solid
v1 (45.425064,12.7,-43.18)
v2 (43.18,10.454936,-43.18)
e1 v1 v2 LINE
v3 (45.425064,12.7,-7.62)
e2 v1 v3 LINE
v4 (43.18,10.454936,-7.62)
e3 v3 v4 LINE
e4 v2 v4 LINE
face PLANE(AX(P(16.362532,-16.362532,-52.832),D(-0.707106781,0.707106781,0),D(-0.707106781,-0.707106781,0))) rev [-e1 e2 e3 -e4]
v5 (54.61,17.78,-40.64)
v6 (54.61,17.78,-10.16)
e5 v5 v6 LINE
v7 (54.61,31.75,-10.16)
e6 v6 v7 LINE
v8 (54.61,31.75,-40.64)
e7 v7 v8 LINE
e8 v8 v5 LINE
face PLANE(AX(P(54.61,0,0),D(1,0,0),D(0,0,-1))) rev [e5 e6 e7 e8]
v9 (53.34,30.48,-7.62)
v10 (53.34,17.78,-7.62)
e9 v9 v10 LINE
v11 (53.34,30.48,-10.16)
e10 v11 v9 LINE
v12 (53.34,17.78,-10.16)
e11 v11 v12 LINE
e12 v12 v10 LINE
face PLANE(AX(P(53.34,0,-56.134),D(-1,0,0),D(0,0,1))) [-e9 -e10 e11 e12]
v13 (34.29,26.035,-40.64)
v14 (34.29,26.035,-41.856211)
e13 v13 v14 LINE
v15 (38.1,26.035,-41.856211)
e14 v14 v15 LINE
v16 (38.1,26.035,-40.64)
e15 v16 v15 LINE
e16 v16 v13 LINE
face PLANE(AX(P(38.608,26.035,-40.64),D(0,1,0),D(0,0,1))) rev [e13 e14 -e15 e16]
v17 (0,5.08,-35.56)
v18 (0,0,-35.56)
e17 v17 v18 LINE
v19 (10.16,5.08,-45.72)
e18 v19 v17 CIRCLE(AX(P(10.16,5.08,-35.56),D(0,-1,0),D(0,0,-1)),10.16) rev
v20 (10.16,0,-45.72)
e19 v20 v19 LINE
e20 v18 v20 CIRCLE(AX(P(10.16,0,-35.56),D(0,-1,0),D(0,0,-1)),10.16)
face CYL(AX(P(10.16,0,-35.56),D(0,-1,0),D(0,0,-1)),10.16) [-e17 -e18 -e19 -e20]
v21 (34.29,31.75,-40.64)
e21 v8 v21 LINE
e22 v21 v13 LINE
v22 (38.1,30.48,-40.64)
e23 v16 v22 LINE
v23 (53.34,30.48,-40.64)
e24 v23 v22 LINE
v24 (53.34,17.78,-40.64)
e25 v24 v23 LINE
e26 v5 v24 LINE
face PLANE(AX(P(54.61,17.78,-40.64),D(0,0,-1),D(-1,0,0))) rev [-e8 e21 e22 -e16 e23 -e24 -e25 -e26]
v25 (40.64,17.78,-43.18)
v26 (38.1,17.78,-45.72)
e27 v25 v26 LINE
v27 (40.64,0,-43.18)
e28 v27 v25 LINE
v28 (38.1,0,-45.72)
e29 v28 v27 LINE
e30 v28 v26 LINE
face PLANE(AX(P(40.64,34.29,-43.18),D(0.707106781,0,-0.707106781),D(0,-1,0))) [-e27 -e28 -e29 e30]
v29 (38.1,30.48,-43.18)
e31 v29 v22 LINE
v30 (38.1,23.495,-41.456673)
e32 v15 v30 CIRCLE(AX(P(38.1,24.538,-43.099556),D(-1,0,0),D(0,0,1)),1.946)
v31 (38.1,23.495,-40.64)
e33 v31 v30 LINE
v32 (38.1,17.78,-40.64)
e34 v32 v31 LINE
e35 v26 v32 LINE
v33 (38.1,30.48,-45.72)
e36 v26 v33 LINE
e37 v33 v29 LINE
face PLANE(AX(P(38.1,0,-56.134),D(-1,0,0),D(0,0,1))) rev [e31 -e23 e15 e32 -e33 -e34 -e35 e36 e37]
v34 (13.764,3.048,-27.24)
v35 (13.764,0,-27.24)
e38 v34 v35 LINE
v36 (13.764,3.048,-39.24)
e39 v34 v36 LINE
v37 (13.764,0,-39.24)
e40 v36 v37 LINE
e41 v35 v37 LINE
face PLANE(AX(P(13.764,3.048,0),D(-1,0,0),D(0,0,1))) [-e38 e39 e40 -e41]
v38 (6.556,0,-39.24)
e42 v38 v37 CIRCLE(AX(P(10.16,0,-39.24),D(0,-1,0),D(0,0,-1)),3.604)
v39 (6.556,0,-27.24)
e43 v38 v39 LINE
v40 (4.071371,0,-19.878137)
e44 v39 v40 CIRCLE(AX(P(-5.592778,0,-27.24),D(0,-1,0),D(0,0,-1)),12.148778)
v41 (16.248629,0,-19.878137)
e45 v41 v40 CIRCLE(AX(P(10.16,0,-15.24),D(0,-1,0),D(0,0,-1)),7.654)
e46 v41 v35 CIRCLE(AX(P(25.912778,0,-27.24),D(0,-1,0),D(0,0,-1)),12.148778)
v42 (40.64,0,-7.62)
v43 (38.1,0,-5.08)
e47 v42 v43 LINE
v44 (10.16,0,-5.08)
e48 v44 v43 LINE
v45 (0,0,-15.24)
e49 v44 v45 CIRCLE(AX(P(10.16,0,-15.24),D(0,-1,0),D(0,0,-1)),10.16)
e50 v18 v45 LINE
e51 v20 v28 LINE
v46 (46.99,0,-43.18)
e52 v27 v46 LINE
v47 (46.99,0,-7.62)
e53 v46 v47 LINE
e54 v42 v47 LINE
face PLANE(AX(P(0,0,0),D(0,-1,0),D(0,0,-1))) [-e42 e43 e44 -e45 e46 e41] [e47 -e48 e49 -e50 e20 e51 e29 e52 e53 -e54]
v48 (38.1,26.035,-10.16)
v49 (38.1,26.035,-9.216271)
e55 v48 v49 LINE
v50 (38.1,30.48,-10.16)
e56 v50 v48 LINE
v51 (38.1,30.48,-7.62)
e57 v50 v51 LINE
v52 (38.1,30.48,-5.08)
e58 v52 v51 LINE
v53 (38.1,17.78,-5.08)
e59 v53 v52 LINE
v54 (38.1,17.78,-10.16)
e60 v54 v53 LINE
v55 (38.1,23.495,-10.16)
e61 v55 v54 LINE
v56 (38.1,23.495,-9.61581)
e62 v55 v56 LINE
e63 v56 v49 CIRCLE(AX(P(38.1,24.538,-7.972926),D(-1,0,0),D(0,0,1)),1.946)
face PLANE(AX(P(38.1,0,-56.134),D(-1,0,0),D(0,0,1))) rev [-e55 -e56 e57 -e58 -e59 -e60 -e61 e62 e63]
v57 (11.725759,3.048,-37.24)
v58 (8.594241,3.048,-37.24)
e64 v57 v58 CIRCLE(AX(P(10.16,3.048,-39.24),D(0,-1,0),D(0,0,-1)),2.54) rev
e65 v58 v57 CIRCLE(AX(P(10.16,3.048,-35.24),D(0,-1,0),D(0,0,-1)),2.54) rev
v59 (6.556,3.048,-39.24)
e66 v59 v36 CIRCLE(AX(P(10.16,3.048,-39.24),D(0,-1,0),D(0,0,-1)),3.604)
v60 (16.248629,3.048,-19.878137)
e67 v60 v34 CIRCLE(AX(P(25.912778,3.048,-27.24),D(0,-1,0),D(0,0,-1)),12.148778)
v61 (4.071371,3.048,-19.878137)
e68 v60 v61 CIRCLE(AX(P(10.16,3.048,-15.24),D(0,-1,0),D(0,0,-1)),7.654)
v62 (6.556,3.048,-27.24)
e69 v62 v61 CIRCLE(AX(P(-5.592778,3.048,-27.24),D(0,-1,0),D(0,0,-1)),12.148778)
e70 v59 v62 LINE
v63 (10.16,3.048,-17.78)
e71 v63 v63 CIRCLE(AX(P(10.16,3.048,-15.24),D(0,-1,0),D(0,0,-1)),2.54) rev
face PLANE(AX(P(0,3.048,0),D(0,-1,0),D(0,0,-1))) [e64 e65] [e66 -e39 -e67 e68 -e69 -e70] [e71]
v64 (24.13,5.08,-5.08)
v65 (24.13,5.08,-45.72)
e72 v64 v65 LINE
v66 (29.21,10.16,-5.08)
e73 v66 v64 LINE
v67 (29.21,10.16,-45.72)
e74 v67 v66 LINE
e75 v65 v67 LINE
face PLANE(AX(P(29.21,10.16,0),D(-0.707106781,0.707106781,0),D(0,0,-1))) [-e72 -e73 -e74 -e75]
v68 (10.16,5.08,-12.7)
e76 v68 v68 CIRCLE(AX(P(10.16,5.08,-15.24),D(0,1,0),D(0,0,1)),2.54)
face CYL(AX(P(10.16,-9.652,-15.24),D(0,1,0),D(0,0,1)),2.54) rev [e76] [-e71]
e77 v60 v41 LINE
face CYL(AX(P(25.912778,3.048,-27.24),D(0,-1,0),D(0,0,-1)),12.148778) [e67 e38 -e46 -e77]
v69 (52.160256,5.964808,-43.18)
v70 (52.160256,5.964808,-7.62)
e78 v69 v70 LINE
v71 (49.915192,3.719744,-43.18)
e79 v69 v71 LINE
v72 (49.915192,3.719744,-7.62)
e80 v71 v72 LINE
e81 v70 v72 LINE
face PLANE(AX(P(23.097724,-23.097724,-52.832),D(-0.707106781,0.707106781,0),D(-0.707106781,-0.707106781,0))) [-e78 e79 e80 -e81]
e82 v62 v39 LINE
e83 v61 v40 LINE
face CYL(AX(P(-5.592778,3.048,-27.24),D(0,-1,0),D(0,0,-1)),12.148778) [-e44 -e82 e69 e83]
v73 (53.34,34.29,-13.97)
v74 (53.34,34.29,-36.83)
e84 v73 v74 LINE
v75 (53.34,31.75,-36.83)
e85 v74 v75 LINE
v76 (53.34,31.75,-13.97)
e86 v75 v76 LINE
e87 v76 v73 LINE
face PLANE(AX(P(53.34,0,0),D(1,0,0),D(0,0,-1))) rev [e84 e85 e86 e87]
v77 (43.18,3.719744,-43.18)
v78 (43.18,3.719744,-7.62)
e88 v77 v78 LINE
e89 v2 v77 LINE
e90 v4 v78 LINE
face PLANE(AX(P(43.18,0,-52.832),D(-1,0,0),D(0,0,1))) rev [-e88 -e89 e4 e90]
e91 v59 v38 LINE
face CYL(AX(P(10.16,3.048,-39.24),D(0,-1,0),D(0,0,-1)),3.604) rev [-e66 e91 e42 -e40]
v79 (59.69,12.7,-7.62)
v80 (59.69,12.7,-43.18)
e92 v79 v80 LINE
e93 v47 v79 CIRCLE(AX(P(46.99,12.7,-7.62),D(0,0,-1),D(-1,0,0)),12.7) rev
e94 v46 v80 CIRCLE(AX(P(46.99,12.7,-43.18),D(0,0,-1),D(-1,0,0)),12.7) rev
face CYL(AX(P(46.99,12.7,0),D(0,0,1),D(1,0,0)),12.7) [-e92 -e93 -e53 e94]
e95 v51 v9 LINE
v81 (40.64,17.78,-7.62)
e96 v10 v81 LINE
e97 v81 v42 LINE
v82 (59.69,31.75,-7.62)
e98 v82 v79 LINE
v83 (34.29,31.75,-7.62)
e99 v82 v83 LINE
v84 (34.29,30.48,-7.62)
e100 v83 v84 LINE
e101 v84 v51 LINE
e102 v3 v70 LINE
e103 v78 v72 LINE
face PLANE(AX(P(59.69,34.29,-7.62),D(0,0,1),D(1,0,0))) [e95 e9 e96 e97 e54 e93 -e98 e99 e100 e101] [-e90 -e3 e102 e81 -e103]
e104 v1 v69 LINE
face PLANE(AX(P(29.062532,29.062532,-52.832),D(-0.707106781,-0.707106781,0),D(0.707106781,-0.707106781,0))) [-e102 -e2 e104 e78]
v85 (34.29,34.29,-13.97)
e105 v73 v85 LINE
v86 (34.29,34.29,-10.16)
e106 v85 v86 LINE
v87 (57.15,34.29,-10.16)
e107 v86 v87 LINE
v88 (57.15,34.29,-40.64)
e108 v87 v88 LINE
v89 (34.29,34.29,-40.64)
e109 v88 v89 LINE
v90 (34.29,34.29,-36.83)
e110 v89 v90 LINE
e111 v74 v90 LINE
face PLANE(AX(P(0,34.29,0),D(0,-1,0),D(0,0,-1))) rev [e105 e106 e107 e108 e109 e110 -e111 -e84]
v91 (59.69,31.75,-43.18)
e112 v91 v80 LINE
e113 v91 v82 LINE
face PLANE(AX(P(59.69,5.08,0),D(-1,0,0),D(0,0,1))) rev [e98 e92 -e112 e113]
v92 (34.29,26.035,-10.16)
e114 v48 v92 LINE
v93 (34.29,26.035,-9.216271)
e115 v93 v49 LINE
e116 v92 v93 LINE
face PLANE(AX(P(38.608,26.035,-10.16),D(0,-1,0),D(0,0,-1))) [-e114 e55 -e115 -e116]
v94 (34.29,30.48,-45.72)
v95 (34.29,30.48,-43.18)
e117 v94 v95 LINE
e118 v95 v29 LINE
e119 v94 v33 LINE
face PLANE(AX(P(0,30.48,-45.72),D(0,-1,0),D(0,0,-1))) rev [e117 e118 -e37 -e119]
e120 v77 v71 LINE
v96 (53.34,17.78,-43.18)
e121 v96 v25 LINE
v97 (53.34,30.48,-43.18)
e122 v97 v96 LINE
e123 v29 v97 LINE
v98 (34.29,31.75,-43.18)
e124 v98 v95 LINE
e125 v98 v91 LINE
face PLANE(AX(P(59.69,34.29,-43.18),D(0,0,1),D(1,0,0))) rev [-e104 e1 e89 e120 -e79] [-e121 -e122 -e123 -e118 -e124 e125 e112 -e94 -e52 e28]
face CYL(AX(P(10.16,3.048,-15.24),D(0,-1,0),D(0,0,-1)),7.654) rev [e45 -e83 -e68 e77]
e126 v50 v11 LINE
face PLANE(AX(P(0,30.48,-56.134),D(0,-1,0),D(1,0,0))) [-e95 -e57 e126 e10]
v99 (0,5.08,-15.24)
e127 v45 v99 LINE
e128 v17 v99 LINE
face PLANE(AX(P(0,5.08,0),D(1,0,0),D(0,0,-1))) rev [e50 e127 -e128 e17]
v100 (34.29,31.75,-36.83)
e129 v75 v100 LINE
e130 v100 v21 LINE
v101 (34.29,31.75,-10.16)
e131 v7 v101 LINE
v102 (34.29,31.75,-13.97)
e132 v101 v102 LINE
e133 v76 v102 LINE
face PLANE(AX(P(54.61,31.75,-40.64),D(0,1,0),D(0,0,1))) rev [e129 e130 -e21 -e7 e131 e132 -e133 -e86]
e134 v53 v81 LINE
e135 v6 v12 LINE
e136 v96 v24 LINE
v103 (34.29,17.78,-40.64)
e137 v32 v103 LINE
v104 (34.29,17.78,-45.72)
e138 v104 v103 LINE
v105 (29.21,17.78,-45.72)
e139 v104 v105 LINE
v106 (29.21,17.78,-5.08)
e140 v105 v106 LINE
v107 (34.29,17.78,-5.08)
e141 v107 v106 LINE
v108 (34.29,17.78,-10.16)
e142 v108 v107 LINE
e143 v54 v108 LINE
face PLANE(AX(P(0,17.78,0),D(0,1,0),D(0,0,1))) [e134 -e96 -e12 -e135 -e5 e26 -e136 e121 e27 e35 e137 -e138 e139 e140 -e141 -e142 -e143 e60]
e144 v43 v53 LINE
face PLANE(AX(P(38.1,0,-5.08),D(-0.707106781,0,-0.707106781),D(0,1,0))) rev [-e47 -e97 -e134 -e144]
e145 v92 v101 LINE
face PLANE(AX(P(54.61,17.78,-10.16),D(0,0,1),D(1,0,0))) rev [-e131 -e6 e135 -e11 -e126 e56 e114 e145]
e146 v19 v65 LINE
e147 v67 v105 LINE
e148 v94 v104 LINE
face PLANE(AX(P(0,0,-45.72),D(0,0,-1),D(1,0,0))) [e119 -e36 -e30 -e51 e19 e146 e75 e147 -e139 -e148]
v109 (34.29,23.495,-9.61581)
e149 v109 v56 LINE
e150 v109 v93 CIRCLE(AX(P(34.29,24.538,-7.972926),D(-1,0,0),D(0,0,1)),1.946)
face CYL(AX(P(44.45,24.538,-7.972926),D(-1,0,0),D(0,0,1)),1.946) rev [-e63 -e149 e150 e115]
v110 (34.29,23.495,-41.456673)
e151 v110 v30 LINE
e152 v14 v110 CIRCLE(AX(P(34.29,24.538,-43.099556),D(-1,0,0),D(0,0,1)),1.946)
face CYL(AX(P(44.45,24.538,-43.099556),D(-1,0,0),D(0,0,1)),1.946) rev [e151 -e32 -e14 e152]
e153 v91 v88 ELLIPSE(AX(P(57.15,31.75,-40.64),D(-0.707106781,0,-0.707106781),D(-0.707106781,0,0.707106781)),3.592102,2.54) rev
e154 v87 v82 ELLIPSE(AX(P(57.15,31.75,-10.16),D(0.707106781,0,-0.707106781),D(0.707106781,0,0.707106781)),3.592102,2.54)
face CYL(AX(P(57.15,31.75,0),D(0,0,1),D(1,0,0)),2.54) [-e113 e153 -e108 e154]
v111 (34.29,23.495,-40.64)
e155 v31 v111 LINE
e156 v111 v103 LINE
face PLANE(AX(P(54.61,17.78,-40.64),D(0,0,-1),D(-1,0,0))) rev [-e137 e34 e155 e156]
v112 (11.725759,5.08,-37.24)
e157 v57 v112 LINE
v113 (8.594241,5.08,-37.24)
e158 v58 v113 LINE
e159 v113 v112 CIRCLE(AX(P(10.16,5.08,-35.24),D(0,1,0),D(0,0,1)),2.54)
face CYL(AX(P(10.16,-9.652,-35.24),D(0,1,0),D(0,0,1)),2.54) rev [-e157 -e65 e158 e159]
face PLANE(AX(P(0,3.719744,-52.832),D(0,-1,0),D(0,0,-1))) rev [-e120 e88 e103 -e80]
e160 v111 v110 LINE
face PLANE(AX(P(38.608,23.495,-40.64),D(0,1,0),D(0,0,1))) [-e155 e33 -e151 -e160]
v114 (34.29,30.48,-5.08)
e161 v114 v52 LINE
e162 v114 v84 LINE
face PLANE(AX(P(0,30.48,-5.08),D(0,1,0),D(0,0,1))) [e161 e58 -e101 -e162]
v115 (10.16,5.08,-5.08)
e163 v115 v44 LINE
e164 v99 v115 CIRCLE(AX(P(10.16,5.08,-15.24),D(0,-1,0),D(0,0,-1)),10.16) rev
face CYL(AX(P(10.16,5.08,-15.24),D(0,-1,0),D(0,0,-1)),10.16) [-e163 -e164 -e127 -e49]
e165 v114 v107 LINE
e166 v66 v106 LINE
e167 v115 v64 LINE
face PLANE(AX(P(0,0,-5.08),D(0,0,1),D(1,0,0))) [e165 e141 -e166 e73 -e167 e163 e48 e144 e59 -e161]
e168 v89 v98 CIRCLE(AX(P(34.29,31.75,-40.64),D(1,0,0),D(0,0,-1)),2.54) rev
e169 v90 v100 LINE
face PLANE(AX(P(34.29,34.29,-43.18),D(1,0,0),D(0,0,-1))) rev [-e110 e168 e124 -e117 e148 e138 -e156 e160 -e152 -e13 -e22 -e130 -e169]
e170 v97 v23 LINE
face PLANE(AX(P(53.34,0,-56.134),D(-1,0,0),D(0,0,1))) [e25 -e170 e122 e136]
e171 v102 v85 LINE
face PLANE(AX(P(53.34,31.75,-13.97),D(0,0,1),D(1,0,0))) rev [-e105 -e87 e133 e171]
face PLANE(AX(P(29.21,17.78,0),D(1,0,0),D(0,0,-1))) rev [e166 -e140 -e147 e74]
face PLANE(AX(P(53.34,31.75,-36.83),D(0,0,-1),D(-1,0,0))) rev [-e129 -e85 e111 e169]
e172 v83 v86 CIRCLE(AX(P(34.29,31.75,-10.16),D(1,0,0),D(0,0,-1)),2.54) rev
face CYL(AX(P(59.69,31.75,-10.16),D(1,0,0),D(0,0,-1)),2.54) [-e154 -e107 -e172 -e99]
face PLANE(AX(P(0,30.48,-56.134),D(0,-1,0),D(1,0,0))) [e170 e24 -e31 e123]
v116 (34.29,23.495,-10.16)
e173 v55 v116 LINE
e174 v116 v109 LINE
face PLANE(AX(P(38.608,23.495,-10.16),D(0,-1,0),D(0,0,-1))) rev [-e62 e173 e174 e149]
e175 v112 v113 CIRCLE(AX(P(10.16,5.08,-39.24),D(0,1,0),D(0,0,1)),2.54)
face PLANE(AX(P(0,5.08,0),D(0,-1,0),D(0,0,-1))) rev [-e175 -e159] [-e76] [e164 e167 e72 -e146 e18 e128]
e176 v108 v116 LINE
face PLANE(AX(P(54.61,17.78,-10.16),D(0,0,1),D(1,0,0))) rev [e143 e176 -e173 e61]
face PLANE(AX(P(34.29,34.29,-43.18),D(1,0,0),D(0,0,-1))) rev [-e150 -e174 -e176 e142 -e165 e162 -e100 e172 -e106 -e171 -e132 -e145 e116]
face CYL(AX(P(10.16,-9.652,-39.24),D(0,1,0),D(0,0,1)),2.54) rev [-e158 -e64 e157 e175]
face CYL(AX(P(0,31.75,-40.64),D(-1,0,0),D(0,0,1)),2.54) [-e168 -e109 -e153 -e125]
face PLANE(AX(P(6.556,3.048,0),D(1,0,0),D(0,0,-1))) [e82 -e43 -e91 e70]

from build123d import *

# Parameters (mm, degrees)
SKETCH1_W           = 59.69
SKETCH1_H           = 50.8
BOSS_EXTRUDE1_DEPTH = 5.08
SKETCH2_W           = 30.48
SKETCH2_H           = 50.8
BOSS_EXTRUDE2_DEPTH = 12.7
SKETCH3_W           = 25.4
SKETCH3_H           = 35.56
BOSS_EXTRUDE3_DEPTH = 16.51
SKETCH5_W           = 30.48
SKETCH5_H           = 13.97
CUT_EXTRUDE1_DEPTH  = 20.32
FILLET2_R           = 2.54
FILLET3_R           = 12.7
CUT_EXTRUDE4_DEPTH  = 48.514
SKETCH12_W          = 3.81
SKETCH12_H          = 12.7
BOSS_EXTRUDE5_DEPTH = 2.54
SKETCH13_W          = 3.175
SKETCH13_H          = 2.54
CUT_EXTRUDE5_DEPTH  = 4.318
SKETCH14_R          = 2.54
CUT_EXTRUDE6_DEPTH  = 14.732
CUT_EXTRUDE7_START  = -3.048
SKETCH15_R          = 2.54
CUT_EXTRUDE7_DEPTH  = 3.048
CUT_EXTRUDE8_DEPTH  = 10.16
CUT_EXTRUDE9_START  = -17.78
CUT_EXTRUDE9_DEPTH  = 17.78
CHAMFER8_SIZE       = 2.54
CHAMFER9_SIZE       = 5.08
SKETCH20_W          = 22.86
SKETCH20_H          = 2.54
CUT_EXTRUDE10_DEPTH = 19.05
FILLET4_R           = 10.16
CUT_EXTRUDE11_DEPTH = 45.212


# Read off the part's stored shape, not the designer's step: Cut-Extrude9
with BuildPart() as part:
    # Sketch1 → Boss-Extrude1 (new body)
    with BuildSketch(Plane(origin=(0, 0, 0), x_dir=(1, 0, 0), z_dir=(0, 1, 0))):
        with Locations((29.845, 25.4)):
            Rectangle(SKETCH1_W, SKETCH1_H)
    extrude(amount=BOSS_EXTRUDE1_DEPTH)

    # Sketch2 → Boss-Extrude2 (add)
    with BuildSketch(Plane(origin=(0, 5.08, 0), x_dir=(1, 0, 0), z_dir=(0, 1, 0))):
        with Locations((44.45, 25.4)):
            Rectangle(SKETCH2_W, SKETCH2_H)
    extrude(amount=BOSS_EXTRUDE2_DEPTH)

    # Sketch3 → Boss-Extrude3 (add)
    with BuildSketch(Plane(origin=(0, 17.78, 0), x_dir=(1, 0, 0), z_dir=(0, 1, 0))):
        with Locations((46.99, 25.4)):
            Rectangle(SKETCH3_W, SKETCH3_H)
    extrude(amount=BOSS_EXTRUDE3_DEPTH)

    # Sketch5 → Cut-Extrude1 (cut)
    with BuildSketch(Plane.ZY.offset(-34.29)):
        with Locations((-25.4, 24.765)):
            Rectangle(SKETCH5_W, SKETCH5_H)
    extrude(amount=-CUT_EXTRUDE1_DEPTH, mode=Mode.SUBTRACT)

    # Fillet2
    fillet2_edges = [part.edges().sort_by_distance(p)[0] for p in [
        (59.69, 34.29, -25.4),
        (46.99, 34.29, -7.62),
        (46.99, 34.29, -43.18),
    ]]
    fillet(fillet2_edges, radius=FILLET2_R)

    # Fillet3
    fillet3_edges = [part.edges().sort_by_distance(p)[0] for p in [
        (59.69, 0, -25.4),
    ]]
    fillet(fillet3_edges, radius=FILLET3_R)

    # Sketch11 → Cut-Extrude4 (cut)
    with BuildSketch(Plane.XY.offset(-7.62)):
        Polygon((45.72, 17.78), (53.34, 17.78), (53.34, 30.48), (45.72, 30.48), (38.1, 30.48), (38.1, 17.78), align=None)
    extrude(amount=-CUT_EXTRUDE4_DEPTH, mode=Mode.SUBTRACT)

    # Sketch12 → Boss-Extrude5 (add)
    with BuildSketch(Plane.XY.offset(-7.62)):
        with Locations((36.195, 24.13)):
            Rectangle(SKETCH12_W, SKETCH12_H)
    boss_extrude5 = extrude(amount=BOSS_EXTRUDE5_DEPTH)

    # Sketch13 → Cut-Extrude5 (cut)
    with BuildSketch(Plane.ZY.offset(-34.29)):
        with Locations((-8.5725, 24.765)):
            Rectangle(SKETCH13_W, SKETCH13_H)
    cut_extrude5 = extrude(amount=-CUT_EXTRUDE5_DEPTH, mode=Mode.SUBTRACT)

    # Mirror6: Boss-Extrude5, Cut-Extrude5 across plane
    add(boss_extrude5.mirror(Plane(origin=(0, 0, -25.4), x_dir=(1, 0, 0), z_dir=(0, 0, -1))))
    add(cut_extrude5.mirror(Plane(origin=(0, 0, -25.4), x_dir=(1, 0, 0), z_dir=(0, 0, -1))), mode=Mode.SUBTRACT)

    # Sketch14 → Cut-Extrude6 (cut)
    with BuildSketch(Plane(origin=(0, 5.08, 0), x_dir=(1, 0, 0), z_dir=(0, 1, 0))):
        with Locations(Location((10.16, 15.24, 0), (0, 0, 270))):
            Circle(SKETCH14_R)
        with Locations((10.16, 39.24)):
            Circle(SKETCH14_R)
        with Locations((10.16, 35.24)):
            Circle(SKETCH14_R)
    extrude(amount=-CUT_EXTRUDE6_DEPTH, mode=Mode.SUBTRACT)

    # Sketch15 → Cut-Extrude7 (cut)
    # profile 1 of 6: a face of its own
    with BuildSketch(Plane.XZ.offset(CUT_EXTRUDE7_START)):
        with BuildLine():
            ThreePointArc((9.51, -22.611397425), (13.149879796, -22.009092908), (16.046575957, -19.724219386))
            ThreePointArc((16.046575957, -19.724219386), (16.636280729, -18.820193838), (17.08820323, -17.84))
            ThreePointArc((17.08820323, -17.84), (17.441095519, -16.561229748), (17.56, -15.24))
            ThreePointArc((17.56, -15.24), (15.617563559, -10.242500625), (10.81, -7.868602575))
            ThreePointArc((10.81, -7.868602575), (10.16, -7.84), (9.51, -7.868602575))
            ThreePointArc((9.51, -7.868602575), (8.519960283, -8.024026765), (7.56, -8.31179677))
            ThreePointArc((7.56, -8.31179677), (4.927409819, -10.007409819), (3.23179677, -12.64))
            ThreePointArc((3.23179677, -12.64), (2.838717156, -16.316483868), (4.273424043, -19.724219386))
            ThreePointArc((4.273424043, -19.724219386), (6.58709424, -21.720304347), (9.51, -22.611397425))
        make_face()
        with Locations(Location((10.16, -15.24, 0), (0, 0, 90))):
            Circle(SKETCH15_R, mode=Mode.SUBTRACT)
    # profile 2 of 6: a face of its own
    with BuildSketch(Plane.XZ.offset(CUT_EXTRUDE7_START)):
        with BuildLine():
            ThreePointArc((4.0713713, -19.878137186), (4.573160427, -20.471724342), (5.132563215, -21.011359924))
            ThreePointArc((5.132563215, -21.011359924), (5.05499215, -20.879662574), (4.975804045, -20.748931147))
            ThreePointArc((4.975804045, -20.748931147), (4.93245275, -20.678870605), (4.888637021, -20.609099577))
            ThreePointArc((4.888637021, -20.609099577), (4.811656565, -20.488952481), (4.733298943, -20.369698976))
            ThreePointArc((4.733298943, -20.369698976), (4.508518631, -20.043284953), (4.273424043, -19.724219386))
            ThreePointArc((4.273424043, -19.724219386), (2.838717156, -16.316483868), (3.23179677, -12.64))
            ThreePointArc((3.23179677, -12.64), (4.927409819, -10.007409819), (7.56, -8.31179677))
            ThreePointArc((7.56, -8.31179677), (8.519960283, -8.024026765), (9.51, -7.868602575))
            ThreePointArc((9.51, -7.868602575), (10.16, -7.84), (10.81, -7.868602575))
            ThreePointArc((10.81, -7.868602575), (15.617563559, -10.242500625), (17.56, -15.24))
            ThreePointArc((17.56, -15.24), (17.441095519, -16.561229748), (17.08820323, -17.84))
            ThreePointArc((17.08820323, -17.84), (16.636280729, -18.820193838), (16.046575957, -19.724219386))
            ThreePointArc((16.046575957, -19.724219386), (15.596911767, -20.35437693), (15.187436785, -21.011359924))
            ThreePointArc((15.187436785, -21.011359924), (15.746839573, -20.471724342), (16.2486287, -19.878137186))
            ThreePointArc((16.2486287, -19.878137186), (16.858574689, -18.943081573), (17.326009125, -17.929243243))
            ThreePointArc((17.326009125, -17.929243243), (17.691014203, -16.606580067), (17.814, -15.24))
            ThreePointArc((17.814, -15.24), (15.804890741, -10.070964836), (10.832310811, -7.615584339))
            ThreePointArc((10.832310811, -7.615584339), (3.457263585, -11.544456664), (4.0713713, -19.878137186))
        make_face()
    # profile 3 of 6: a face of its own
    with BuildSketch(Plane.XZ.offset(CUT_EXTRUDE7_START)):
        with BuildLine():
            Line((6.81, -27.24), (6.81, -39.24))
            ThreePointArc((6.81, -39.24), (10.16, -42.59), (13.51, -39.24))
            Line((13.51, -39.24), (13.51, -27.24))
            ThreePointArc((13.51, -27.24), (13.644215557, -25.420308369), (14.043957423, -23.64))
            ThreePointArc((14.043957423, -23.64), (14.539499055, -22.292533204), (15.187436785, -21.011359924))
            ThreePointArc((15.187436785, -21.011359924), (10.16, -22.894), (5.132563215, -21.011359924))
            ThreePointArc((5.132563215, -21.011359924), (5.171342294, -21.078619011), (5.209699594, -21.146119525))
            ThreePointArc((5.209699594, -21.146119525), (6.403255377, -24.089748397), (6.81, -27.24))
        make_face()
        with BuildLine():
            ThreePointArc((8.594241398, -37.24), (10.16, -32.7), (11.725758602, -37.24))
            ThreePointArc((11.725758602, -37.24), (10.16, -41.78), (8.594241398, -37.24))
        make_face(mode=Mode.SUBTRACT)
    # profile 4 of 6: a face of its own
    with BuildSketch(Plane.XZ.offset(CUT_EXTRUDE7_START)):
        with BuildLine():
            ThreePointArc((13.51, -39.24), (10.16, -42.59), (6.81, -39.24))
            Line((6.81, -39.24), (6.81, -27.24))
            ThreePointArc((6.81, -27.24), (6.403255377, -24.089748397), (5.209699594, -21.146119525))
            ThreePointArc((5.209699594, -21.146119525), (5.171342294, -21.078619011), (5.132563215, -21.011359924))
            ThreePointArc((5.132563215, -21.011359924), (4.573160427, -20.471724342), (4.0713713, -19.878137186))
            ThreePointArc((4.0713713, -19.878137186), (4.30165132, -20.19066852), (4.521828292, -20.510397817))
            ThreePointArc((4.521828292, -20.510397817), (4.598581207, -20.627209095), (4.673985158, -20.744895666))
            ThreePointArc((4.673985158, -20.744895666), (4.716903572, -20.813237833), (4.759367064, -20.881863585))
            ThreePointArc((4.759367064, -20.881863585), (4.875727352, -21.075326298), (4.988472599, -21.270917829))
            ThreePointArc((4.988472599, -21.270917829), (6.157585215, -24.154263292), (6.556, -27.24))
            Line((6.556, -27.24), (6.556, -39.24))
            ThreePointArc((6.556, -39.24), (10.16, -42.844), (13.764, -39.24))
            Line((13.764, -39.24), (13.764, -27.24))
            ThreePointArc((13.764, -27.24), (13.895466918, -25.457574349), (14.287022358, -23.71372542))
            ThreePointArc((14.287022358, -23.71372542), (15.096450182, -21.708286085), (16.2486287, -19.878137186))
            ThreePointArc((16.2486287, -19.878137186), (15.746839573, -20.471724342), (15.187436785, -21.011359924))
            ThreePointArc((15.187436785, -21.011359924), (14.539499055, -22.292533204), (14.043957423, -23.64))
            ThreePointArc((14.043957423, -23.64), (13.644215557, -25.420308369), (13.51, -27.24))
            Line((13.51, -27.24), (13.51, -39.24))
        make_face()
    # profile 5 of 6: a face of its own
    with BuildSketch(Plane.XZ.offset(CUT_EXTRUDE7_START)):
        with BuildLine():
            ThreePointArc((4.0713713, -19.878137186), (4.573160427, -20.471724342), (5.132563215, -21.011359924))
            ThreePointArc((5.132563215, -21.011359924), (5.05499215, -20.879662574), (4.975804045, -20.748931147))
            ThreePointArc((4.975804045, -20.748931147), (4.93245275, -20.678870605), (4.888637021, -20.609099577))
            ThreePointArc((4.888637021, -20.609099577), (4.811656565, -20.488952481), (4.733298943, -20.369698976))
            ThreePointArc((4.733298943, -20.369698976), (4.508518631, -20.043284953), (4.273424043, -19.724219386))
            ThreePointArc((4.273424043, -19.724219386), (2.838717156, -16.316483868), (3.23179677, -12.64))
            ThreePointArc((3.23179677, -12.64), (4.927409819, -10.007409819), (7.56, -8.31179677))
            ThreePointArc((7.56, -8.31179677), (8.519960283, -8.024026765), (9.51, -7.868602575))
            ThreePointArc((9.51, -7.868602575), (10.16, -7.84), (10.81, -7.868602575))
            ThreePointArc((10.81, -7.868602575), (15.617563559, -10.242500625), (17.56, -15.24))
            ThreePointArc((17.56, -15.24), (17.441095519, -16.561229748), (17.08820323, -17.84))
            ThreePointArc((17.08820323, -17.84), (16.636280729, -18.820193838), (16.046575957, -19.724219386))
            ThreePointArc((16.046575957, -19.724219386), (15.596911767, -20.35437693), (15.187436785, -21.011359924))
            ThreePointArc((15.187436785, -21.011359924), (15.746839573, -20.471724342), (16.2486287, -19.878137186))
            ThreePointArc((16.2486287, -19.878137186), (16.858574689, -18.943081573), (17.326009125, -17.929243243))
            ThreePointArc((17.326009125, -17.929243243), (17.691014203, -16.606580067), (17.814, -15.24))
            ThreePointArc((17.814, -15.24), (15.804890741, -10.070964836), (10.832310811, -7.615584339))
            ThreePointArc((10.832310811, -7.615584339), (3.457263585, -11.544456664), (4.0713713, -19.878137186))
        make_face()
    # profile 6 of 6: a face of its own
    with BuildSketch(Plane.XZ.offset(CUT_EXTRUDE7_START)):
        with BuildLine():
            ThreePointArc((4.975804045, -20.748931147), (5.05499215, -20.879662574), (5.132563215, -21.011359924))
            ThreePointArc((5.132563215, -21.011359924), (10.16, -22.894), (15.187436785, -21.011359924))
            ThreePointArc((15.187436785, -21.011359924), (15.596911767, -20.35437693), (16.046575957, -19.724219386))
            ThreePointArc((16.046575957, -19.724219386), (13.149879796, -22.009092908), (9.51, -22.611397425))
            ThreePointArc((9.51, -22.611397425), (6.58709424, -21.720304347), (4.273424043, -19.724219386))
            ThreePointArc((4.273424043, -19.724219386), (4.508518631, -20.043284953), (4.733298943, -20.369698976))
            ThreePointArc((4.733298943, -20.369698976), (4.811656565, -20.488952481), (4.888637021, -20.609099577))
            ThreePointArc((4.888637021, -20.609099577), (4.93245275, -20.678870605), (4.975804045, -20.748931147))
        make_face()
    extrude(amount=CUT_EXTRUDE7_DEPTH, mode=Mode.SUBTRACT)

    # Sketch16 → Cut-Extrude8 (cut)
    with BuildSketch(Plane.ZY.offset(-34.29)):
        with BuildLine():
            Line((-43.815, 26.035), (-41.856211186, 26.035))
            ThreePointArc((-41.856211186, 26.035), (-45.021919195, 24.23561484), (-41.456672525, 23.495))
            Line((-41.456672525, 23.495), (-43.815, 23.495))
            Line((-43.815, 23.495), (-43.815, 26.035))
        make_face()
        with BuildLine():
            ThreePointArc((-41.153556271, 24.538), (-41.337956779, 25.364851397), (-41.856211186, 26.035))
            Line((-41.856211186, 26.035), (-43.815, 26.035))
            Line((-43.815, 26.035), (-43.815, 23.495))
            Line((-43.815, 23.495), (-41.456672525, 23.495))
            ThreePointArc((-41.456672525, 23.495), (-41.230871202, 23.994923471), (-41.153556271, 24.538))
        make_face()
        with BuildLine():
            Line((-6.985, 26.035), (-9.216271419, 26.035))
            ThreePointArc((-9.216271419, 26.035), (-9.895289259, 24.84038516), (-9.615810079, 23.495))
            Line((-9.615810079, 23.495), (-6.985, 23.495))
            Line((-6.985, 23.495), (-6.985, 26.035))
        make_face()
        with BuildLine():
            ThreePointArc((-6.026926334, 24.538), (-7.146074937, 26.299599491), (-9.216271419, 26.035))
            Line((-9.216271419, 26.035), (-6.985, 26.035))
            Line((-6.985, 26.035), (-6.985, 23.495))
            Line((-6.985, 23.495), (-9.615810079, 23.495))
            ThreePointArc((-9.615810079, 23.495), (-7.429849805, 22.669314932), (-6.026926334, 24.538))
        make_face()
    extrude(amount=-CUT_EXTRUDE8_DEPTH, mode=Mode.SUBTRACT)

    # Cut-Extrude9 outline → Cut-Extrude9 (cut)
    with BuildSketch(Plane(origin=(0, 17.78, 0), x_dir=(1, 0, 0), z_dir=(0, 1, 0)).offset(CUT_EXTRUDE9_START)):
        Polygon((38.1, 45.72), (38.1, 43.18), (59.69, 43.18), (59.69, 50.8), (0, 50.8), (0, 45.72), align=None)
        Polygon((0, 0), (59.69, 0), (59.69, 7.62), (38.1, 7.62), (38.1, 5.08), (0, 5.08), align=None)
    extrude(amount=CUT_EXTRUDE9_DEPTH, mode=Mode.SUBTRACT)

    # Chamfer8
    chamfer8_edges = [part.edges().sort_by_distance(p)[0] for p in [
        (38.1, 8.89, -43.18),
        (38.1, 8.89, -7.62),
    ]]
    chamfer(chamfer8_edges, length=CHAMFER8_SIZE - 0.0001)  # a hair under: the kernel refuses the full size

    # Chamfer9
    chamfer9_edges = [part.edges().sort_by_distance(p)[0] for p in [
        (29.21, 5.08, -25.4),
    ]]
    chamfer(chamfer9_edges, length=CHAMFER9_SIZE)

    # Sketch20 → Cut-Extrude10 (cut)
    with BuildSketch(Plane.ZY.offset(-34.29)):
        with Locations((-25.4, 33.02)):
            Rectangle(SKETCH20_W, SKETCH20_H)
    extrude(amount=-CUT_EXTRUDE10_DEPTH, mode=Mode.SUBTRACT)

    # Fillet4
    fillet4_edges = [part.edges().sort_by_distance(p)[0] for p in [
        (0, 2.54, -45.72),
        (0, 2.54, -5.08),
    ]]
    fillet(fillet4_edges, radius=FILLET4_R)

    # Sketch21 → Cut-Extrude11 (cut)
    with BuildSketch(Plane.XY.offset(-7.62)):
        Polygon((43.18, 10.45493597), (43.18, 3.719743879), (49.915192091, 3.719743879), align=None)
        Polygon((45.42506403, 12.7), (43.18, 10.45493597), (47.670128061, 10.45493597), align=None)
        Polygon((47.670128061, 10.45493597), (43.18, 10.45493597), (49.915192091, 3.719743879), (49.915192091, 8.209871939), align=None)
        Polygon((49.915192091, 8.209871939), (49.915192091, 3.719743879), (52.160256121, 5.964807909), align=None)
    extrude(amount=-CUT_EXTRUDE11_DEPTH, mode=Mode.SUBTRACT)


solid = part.part
